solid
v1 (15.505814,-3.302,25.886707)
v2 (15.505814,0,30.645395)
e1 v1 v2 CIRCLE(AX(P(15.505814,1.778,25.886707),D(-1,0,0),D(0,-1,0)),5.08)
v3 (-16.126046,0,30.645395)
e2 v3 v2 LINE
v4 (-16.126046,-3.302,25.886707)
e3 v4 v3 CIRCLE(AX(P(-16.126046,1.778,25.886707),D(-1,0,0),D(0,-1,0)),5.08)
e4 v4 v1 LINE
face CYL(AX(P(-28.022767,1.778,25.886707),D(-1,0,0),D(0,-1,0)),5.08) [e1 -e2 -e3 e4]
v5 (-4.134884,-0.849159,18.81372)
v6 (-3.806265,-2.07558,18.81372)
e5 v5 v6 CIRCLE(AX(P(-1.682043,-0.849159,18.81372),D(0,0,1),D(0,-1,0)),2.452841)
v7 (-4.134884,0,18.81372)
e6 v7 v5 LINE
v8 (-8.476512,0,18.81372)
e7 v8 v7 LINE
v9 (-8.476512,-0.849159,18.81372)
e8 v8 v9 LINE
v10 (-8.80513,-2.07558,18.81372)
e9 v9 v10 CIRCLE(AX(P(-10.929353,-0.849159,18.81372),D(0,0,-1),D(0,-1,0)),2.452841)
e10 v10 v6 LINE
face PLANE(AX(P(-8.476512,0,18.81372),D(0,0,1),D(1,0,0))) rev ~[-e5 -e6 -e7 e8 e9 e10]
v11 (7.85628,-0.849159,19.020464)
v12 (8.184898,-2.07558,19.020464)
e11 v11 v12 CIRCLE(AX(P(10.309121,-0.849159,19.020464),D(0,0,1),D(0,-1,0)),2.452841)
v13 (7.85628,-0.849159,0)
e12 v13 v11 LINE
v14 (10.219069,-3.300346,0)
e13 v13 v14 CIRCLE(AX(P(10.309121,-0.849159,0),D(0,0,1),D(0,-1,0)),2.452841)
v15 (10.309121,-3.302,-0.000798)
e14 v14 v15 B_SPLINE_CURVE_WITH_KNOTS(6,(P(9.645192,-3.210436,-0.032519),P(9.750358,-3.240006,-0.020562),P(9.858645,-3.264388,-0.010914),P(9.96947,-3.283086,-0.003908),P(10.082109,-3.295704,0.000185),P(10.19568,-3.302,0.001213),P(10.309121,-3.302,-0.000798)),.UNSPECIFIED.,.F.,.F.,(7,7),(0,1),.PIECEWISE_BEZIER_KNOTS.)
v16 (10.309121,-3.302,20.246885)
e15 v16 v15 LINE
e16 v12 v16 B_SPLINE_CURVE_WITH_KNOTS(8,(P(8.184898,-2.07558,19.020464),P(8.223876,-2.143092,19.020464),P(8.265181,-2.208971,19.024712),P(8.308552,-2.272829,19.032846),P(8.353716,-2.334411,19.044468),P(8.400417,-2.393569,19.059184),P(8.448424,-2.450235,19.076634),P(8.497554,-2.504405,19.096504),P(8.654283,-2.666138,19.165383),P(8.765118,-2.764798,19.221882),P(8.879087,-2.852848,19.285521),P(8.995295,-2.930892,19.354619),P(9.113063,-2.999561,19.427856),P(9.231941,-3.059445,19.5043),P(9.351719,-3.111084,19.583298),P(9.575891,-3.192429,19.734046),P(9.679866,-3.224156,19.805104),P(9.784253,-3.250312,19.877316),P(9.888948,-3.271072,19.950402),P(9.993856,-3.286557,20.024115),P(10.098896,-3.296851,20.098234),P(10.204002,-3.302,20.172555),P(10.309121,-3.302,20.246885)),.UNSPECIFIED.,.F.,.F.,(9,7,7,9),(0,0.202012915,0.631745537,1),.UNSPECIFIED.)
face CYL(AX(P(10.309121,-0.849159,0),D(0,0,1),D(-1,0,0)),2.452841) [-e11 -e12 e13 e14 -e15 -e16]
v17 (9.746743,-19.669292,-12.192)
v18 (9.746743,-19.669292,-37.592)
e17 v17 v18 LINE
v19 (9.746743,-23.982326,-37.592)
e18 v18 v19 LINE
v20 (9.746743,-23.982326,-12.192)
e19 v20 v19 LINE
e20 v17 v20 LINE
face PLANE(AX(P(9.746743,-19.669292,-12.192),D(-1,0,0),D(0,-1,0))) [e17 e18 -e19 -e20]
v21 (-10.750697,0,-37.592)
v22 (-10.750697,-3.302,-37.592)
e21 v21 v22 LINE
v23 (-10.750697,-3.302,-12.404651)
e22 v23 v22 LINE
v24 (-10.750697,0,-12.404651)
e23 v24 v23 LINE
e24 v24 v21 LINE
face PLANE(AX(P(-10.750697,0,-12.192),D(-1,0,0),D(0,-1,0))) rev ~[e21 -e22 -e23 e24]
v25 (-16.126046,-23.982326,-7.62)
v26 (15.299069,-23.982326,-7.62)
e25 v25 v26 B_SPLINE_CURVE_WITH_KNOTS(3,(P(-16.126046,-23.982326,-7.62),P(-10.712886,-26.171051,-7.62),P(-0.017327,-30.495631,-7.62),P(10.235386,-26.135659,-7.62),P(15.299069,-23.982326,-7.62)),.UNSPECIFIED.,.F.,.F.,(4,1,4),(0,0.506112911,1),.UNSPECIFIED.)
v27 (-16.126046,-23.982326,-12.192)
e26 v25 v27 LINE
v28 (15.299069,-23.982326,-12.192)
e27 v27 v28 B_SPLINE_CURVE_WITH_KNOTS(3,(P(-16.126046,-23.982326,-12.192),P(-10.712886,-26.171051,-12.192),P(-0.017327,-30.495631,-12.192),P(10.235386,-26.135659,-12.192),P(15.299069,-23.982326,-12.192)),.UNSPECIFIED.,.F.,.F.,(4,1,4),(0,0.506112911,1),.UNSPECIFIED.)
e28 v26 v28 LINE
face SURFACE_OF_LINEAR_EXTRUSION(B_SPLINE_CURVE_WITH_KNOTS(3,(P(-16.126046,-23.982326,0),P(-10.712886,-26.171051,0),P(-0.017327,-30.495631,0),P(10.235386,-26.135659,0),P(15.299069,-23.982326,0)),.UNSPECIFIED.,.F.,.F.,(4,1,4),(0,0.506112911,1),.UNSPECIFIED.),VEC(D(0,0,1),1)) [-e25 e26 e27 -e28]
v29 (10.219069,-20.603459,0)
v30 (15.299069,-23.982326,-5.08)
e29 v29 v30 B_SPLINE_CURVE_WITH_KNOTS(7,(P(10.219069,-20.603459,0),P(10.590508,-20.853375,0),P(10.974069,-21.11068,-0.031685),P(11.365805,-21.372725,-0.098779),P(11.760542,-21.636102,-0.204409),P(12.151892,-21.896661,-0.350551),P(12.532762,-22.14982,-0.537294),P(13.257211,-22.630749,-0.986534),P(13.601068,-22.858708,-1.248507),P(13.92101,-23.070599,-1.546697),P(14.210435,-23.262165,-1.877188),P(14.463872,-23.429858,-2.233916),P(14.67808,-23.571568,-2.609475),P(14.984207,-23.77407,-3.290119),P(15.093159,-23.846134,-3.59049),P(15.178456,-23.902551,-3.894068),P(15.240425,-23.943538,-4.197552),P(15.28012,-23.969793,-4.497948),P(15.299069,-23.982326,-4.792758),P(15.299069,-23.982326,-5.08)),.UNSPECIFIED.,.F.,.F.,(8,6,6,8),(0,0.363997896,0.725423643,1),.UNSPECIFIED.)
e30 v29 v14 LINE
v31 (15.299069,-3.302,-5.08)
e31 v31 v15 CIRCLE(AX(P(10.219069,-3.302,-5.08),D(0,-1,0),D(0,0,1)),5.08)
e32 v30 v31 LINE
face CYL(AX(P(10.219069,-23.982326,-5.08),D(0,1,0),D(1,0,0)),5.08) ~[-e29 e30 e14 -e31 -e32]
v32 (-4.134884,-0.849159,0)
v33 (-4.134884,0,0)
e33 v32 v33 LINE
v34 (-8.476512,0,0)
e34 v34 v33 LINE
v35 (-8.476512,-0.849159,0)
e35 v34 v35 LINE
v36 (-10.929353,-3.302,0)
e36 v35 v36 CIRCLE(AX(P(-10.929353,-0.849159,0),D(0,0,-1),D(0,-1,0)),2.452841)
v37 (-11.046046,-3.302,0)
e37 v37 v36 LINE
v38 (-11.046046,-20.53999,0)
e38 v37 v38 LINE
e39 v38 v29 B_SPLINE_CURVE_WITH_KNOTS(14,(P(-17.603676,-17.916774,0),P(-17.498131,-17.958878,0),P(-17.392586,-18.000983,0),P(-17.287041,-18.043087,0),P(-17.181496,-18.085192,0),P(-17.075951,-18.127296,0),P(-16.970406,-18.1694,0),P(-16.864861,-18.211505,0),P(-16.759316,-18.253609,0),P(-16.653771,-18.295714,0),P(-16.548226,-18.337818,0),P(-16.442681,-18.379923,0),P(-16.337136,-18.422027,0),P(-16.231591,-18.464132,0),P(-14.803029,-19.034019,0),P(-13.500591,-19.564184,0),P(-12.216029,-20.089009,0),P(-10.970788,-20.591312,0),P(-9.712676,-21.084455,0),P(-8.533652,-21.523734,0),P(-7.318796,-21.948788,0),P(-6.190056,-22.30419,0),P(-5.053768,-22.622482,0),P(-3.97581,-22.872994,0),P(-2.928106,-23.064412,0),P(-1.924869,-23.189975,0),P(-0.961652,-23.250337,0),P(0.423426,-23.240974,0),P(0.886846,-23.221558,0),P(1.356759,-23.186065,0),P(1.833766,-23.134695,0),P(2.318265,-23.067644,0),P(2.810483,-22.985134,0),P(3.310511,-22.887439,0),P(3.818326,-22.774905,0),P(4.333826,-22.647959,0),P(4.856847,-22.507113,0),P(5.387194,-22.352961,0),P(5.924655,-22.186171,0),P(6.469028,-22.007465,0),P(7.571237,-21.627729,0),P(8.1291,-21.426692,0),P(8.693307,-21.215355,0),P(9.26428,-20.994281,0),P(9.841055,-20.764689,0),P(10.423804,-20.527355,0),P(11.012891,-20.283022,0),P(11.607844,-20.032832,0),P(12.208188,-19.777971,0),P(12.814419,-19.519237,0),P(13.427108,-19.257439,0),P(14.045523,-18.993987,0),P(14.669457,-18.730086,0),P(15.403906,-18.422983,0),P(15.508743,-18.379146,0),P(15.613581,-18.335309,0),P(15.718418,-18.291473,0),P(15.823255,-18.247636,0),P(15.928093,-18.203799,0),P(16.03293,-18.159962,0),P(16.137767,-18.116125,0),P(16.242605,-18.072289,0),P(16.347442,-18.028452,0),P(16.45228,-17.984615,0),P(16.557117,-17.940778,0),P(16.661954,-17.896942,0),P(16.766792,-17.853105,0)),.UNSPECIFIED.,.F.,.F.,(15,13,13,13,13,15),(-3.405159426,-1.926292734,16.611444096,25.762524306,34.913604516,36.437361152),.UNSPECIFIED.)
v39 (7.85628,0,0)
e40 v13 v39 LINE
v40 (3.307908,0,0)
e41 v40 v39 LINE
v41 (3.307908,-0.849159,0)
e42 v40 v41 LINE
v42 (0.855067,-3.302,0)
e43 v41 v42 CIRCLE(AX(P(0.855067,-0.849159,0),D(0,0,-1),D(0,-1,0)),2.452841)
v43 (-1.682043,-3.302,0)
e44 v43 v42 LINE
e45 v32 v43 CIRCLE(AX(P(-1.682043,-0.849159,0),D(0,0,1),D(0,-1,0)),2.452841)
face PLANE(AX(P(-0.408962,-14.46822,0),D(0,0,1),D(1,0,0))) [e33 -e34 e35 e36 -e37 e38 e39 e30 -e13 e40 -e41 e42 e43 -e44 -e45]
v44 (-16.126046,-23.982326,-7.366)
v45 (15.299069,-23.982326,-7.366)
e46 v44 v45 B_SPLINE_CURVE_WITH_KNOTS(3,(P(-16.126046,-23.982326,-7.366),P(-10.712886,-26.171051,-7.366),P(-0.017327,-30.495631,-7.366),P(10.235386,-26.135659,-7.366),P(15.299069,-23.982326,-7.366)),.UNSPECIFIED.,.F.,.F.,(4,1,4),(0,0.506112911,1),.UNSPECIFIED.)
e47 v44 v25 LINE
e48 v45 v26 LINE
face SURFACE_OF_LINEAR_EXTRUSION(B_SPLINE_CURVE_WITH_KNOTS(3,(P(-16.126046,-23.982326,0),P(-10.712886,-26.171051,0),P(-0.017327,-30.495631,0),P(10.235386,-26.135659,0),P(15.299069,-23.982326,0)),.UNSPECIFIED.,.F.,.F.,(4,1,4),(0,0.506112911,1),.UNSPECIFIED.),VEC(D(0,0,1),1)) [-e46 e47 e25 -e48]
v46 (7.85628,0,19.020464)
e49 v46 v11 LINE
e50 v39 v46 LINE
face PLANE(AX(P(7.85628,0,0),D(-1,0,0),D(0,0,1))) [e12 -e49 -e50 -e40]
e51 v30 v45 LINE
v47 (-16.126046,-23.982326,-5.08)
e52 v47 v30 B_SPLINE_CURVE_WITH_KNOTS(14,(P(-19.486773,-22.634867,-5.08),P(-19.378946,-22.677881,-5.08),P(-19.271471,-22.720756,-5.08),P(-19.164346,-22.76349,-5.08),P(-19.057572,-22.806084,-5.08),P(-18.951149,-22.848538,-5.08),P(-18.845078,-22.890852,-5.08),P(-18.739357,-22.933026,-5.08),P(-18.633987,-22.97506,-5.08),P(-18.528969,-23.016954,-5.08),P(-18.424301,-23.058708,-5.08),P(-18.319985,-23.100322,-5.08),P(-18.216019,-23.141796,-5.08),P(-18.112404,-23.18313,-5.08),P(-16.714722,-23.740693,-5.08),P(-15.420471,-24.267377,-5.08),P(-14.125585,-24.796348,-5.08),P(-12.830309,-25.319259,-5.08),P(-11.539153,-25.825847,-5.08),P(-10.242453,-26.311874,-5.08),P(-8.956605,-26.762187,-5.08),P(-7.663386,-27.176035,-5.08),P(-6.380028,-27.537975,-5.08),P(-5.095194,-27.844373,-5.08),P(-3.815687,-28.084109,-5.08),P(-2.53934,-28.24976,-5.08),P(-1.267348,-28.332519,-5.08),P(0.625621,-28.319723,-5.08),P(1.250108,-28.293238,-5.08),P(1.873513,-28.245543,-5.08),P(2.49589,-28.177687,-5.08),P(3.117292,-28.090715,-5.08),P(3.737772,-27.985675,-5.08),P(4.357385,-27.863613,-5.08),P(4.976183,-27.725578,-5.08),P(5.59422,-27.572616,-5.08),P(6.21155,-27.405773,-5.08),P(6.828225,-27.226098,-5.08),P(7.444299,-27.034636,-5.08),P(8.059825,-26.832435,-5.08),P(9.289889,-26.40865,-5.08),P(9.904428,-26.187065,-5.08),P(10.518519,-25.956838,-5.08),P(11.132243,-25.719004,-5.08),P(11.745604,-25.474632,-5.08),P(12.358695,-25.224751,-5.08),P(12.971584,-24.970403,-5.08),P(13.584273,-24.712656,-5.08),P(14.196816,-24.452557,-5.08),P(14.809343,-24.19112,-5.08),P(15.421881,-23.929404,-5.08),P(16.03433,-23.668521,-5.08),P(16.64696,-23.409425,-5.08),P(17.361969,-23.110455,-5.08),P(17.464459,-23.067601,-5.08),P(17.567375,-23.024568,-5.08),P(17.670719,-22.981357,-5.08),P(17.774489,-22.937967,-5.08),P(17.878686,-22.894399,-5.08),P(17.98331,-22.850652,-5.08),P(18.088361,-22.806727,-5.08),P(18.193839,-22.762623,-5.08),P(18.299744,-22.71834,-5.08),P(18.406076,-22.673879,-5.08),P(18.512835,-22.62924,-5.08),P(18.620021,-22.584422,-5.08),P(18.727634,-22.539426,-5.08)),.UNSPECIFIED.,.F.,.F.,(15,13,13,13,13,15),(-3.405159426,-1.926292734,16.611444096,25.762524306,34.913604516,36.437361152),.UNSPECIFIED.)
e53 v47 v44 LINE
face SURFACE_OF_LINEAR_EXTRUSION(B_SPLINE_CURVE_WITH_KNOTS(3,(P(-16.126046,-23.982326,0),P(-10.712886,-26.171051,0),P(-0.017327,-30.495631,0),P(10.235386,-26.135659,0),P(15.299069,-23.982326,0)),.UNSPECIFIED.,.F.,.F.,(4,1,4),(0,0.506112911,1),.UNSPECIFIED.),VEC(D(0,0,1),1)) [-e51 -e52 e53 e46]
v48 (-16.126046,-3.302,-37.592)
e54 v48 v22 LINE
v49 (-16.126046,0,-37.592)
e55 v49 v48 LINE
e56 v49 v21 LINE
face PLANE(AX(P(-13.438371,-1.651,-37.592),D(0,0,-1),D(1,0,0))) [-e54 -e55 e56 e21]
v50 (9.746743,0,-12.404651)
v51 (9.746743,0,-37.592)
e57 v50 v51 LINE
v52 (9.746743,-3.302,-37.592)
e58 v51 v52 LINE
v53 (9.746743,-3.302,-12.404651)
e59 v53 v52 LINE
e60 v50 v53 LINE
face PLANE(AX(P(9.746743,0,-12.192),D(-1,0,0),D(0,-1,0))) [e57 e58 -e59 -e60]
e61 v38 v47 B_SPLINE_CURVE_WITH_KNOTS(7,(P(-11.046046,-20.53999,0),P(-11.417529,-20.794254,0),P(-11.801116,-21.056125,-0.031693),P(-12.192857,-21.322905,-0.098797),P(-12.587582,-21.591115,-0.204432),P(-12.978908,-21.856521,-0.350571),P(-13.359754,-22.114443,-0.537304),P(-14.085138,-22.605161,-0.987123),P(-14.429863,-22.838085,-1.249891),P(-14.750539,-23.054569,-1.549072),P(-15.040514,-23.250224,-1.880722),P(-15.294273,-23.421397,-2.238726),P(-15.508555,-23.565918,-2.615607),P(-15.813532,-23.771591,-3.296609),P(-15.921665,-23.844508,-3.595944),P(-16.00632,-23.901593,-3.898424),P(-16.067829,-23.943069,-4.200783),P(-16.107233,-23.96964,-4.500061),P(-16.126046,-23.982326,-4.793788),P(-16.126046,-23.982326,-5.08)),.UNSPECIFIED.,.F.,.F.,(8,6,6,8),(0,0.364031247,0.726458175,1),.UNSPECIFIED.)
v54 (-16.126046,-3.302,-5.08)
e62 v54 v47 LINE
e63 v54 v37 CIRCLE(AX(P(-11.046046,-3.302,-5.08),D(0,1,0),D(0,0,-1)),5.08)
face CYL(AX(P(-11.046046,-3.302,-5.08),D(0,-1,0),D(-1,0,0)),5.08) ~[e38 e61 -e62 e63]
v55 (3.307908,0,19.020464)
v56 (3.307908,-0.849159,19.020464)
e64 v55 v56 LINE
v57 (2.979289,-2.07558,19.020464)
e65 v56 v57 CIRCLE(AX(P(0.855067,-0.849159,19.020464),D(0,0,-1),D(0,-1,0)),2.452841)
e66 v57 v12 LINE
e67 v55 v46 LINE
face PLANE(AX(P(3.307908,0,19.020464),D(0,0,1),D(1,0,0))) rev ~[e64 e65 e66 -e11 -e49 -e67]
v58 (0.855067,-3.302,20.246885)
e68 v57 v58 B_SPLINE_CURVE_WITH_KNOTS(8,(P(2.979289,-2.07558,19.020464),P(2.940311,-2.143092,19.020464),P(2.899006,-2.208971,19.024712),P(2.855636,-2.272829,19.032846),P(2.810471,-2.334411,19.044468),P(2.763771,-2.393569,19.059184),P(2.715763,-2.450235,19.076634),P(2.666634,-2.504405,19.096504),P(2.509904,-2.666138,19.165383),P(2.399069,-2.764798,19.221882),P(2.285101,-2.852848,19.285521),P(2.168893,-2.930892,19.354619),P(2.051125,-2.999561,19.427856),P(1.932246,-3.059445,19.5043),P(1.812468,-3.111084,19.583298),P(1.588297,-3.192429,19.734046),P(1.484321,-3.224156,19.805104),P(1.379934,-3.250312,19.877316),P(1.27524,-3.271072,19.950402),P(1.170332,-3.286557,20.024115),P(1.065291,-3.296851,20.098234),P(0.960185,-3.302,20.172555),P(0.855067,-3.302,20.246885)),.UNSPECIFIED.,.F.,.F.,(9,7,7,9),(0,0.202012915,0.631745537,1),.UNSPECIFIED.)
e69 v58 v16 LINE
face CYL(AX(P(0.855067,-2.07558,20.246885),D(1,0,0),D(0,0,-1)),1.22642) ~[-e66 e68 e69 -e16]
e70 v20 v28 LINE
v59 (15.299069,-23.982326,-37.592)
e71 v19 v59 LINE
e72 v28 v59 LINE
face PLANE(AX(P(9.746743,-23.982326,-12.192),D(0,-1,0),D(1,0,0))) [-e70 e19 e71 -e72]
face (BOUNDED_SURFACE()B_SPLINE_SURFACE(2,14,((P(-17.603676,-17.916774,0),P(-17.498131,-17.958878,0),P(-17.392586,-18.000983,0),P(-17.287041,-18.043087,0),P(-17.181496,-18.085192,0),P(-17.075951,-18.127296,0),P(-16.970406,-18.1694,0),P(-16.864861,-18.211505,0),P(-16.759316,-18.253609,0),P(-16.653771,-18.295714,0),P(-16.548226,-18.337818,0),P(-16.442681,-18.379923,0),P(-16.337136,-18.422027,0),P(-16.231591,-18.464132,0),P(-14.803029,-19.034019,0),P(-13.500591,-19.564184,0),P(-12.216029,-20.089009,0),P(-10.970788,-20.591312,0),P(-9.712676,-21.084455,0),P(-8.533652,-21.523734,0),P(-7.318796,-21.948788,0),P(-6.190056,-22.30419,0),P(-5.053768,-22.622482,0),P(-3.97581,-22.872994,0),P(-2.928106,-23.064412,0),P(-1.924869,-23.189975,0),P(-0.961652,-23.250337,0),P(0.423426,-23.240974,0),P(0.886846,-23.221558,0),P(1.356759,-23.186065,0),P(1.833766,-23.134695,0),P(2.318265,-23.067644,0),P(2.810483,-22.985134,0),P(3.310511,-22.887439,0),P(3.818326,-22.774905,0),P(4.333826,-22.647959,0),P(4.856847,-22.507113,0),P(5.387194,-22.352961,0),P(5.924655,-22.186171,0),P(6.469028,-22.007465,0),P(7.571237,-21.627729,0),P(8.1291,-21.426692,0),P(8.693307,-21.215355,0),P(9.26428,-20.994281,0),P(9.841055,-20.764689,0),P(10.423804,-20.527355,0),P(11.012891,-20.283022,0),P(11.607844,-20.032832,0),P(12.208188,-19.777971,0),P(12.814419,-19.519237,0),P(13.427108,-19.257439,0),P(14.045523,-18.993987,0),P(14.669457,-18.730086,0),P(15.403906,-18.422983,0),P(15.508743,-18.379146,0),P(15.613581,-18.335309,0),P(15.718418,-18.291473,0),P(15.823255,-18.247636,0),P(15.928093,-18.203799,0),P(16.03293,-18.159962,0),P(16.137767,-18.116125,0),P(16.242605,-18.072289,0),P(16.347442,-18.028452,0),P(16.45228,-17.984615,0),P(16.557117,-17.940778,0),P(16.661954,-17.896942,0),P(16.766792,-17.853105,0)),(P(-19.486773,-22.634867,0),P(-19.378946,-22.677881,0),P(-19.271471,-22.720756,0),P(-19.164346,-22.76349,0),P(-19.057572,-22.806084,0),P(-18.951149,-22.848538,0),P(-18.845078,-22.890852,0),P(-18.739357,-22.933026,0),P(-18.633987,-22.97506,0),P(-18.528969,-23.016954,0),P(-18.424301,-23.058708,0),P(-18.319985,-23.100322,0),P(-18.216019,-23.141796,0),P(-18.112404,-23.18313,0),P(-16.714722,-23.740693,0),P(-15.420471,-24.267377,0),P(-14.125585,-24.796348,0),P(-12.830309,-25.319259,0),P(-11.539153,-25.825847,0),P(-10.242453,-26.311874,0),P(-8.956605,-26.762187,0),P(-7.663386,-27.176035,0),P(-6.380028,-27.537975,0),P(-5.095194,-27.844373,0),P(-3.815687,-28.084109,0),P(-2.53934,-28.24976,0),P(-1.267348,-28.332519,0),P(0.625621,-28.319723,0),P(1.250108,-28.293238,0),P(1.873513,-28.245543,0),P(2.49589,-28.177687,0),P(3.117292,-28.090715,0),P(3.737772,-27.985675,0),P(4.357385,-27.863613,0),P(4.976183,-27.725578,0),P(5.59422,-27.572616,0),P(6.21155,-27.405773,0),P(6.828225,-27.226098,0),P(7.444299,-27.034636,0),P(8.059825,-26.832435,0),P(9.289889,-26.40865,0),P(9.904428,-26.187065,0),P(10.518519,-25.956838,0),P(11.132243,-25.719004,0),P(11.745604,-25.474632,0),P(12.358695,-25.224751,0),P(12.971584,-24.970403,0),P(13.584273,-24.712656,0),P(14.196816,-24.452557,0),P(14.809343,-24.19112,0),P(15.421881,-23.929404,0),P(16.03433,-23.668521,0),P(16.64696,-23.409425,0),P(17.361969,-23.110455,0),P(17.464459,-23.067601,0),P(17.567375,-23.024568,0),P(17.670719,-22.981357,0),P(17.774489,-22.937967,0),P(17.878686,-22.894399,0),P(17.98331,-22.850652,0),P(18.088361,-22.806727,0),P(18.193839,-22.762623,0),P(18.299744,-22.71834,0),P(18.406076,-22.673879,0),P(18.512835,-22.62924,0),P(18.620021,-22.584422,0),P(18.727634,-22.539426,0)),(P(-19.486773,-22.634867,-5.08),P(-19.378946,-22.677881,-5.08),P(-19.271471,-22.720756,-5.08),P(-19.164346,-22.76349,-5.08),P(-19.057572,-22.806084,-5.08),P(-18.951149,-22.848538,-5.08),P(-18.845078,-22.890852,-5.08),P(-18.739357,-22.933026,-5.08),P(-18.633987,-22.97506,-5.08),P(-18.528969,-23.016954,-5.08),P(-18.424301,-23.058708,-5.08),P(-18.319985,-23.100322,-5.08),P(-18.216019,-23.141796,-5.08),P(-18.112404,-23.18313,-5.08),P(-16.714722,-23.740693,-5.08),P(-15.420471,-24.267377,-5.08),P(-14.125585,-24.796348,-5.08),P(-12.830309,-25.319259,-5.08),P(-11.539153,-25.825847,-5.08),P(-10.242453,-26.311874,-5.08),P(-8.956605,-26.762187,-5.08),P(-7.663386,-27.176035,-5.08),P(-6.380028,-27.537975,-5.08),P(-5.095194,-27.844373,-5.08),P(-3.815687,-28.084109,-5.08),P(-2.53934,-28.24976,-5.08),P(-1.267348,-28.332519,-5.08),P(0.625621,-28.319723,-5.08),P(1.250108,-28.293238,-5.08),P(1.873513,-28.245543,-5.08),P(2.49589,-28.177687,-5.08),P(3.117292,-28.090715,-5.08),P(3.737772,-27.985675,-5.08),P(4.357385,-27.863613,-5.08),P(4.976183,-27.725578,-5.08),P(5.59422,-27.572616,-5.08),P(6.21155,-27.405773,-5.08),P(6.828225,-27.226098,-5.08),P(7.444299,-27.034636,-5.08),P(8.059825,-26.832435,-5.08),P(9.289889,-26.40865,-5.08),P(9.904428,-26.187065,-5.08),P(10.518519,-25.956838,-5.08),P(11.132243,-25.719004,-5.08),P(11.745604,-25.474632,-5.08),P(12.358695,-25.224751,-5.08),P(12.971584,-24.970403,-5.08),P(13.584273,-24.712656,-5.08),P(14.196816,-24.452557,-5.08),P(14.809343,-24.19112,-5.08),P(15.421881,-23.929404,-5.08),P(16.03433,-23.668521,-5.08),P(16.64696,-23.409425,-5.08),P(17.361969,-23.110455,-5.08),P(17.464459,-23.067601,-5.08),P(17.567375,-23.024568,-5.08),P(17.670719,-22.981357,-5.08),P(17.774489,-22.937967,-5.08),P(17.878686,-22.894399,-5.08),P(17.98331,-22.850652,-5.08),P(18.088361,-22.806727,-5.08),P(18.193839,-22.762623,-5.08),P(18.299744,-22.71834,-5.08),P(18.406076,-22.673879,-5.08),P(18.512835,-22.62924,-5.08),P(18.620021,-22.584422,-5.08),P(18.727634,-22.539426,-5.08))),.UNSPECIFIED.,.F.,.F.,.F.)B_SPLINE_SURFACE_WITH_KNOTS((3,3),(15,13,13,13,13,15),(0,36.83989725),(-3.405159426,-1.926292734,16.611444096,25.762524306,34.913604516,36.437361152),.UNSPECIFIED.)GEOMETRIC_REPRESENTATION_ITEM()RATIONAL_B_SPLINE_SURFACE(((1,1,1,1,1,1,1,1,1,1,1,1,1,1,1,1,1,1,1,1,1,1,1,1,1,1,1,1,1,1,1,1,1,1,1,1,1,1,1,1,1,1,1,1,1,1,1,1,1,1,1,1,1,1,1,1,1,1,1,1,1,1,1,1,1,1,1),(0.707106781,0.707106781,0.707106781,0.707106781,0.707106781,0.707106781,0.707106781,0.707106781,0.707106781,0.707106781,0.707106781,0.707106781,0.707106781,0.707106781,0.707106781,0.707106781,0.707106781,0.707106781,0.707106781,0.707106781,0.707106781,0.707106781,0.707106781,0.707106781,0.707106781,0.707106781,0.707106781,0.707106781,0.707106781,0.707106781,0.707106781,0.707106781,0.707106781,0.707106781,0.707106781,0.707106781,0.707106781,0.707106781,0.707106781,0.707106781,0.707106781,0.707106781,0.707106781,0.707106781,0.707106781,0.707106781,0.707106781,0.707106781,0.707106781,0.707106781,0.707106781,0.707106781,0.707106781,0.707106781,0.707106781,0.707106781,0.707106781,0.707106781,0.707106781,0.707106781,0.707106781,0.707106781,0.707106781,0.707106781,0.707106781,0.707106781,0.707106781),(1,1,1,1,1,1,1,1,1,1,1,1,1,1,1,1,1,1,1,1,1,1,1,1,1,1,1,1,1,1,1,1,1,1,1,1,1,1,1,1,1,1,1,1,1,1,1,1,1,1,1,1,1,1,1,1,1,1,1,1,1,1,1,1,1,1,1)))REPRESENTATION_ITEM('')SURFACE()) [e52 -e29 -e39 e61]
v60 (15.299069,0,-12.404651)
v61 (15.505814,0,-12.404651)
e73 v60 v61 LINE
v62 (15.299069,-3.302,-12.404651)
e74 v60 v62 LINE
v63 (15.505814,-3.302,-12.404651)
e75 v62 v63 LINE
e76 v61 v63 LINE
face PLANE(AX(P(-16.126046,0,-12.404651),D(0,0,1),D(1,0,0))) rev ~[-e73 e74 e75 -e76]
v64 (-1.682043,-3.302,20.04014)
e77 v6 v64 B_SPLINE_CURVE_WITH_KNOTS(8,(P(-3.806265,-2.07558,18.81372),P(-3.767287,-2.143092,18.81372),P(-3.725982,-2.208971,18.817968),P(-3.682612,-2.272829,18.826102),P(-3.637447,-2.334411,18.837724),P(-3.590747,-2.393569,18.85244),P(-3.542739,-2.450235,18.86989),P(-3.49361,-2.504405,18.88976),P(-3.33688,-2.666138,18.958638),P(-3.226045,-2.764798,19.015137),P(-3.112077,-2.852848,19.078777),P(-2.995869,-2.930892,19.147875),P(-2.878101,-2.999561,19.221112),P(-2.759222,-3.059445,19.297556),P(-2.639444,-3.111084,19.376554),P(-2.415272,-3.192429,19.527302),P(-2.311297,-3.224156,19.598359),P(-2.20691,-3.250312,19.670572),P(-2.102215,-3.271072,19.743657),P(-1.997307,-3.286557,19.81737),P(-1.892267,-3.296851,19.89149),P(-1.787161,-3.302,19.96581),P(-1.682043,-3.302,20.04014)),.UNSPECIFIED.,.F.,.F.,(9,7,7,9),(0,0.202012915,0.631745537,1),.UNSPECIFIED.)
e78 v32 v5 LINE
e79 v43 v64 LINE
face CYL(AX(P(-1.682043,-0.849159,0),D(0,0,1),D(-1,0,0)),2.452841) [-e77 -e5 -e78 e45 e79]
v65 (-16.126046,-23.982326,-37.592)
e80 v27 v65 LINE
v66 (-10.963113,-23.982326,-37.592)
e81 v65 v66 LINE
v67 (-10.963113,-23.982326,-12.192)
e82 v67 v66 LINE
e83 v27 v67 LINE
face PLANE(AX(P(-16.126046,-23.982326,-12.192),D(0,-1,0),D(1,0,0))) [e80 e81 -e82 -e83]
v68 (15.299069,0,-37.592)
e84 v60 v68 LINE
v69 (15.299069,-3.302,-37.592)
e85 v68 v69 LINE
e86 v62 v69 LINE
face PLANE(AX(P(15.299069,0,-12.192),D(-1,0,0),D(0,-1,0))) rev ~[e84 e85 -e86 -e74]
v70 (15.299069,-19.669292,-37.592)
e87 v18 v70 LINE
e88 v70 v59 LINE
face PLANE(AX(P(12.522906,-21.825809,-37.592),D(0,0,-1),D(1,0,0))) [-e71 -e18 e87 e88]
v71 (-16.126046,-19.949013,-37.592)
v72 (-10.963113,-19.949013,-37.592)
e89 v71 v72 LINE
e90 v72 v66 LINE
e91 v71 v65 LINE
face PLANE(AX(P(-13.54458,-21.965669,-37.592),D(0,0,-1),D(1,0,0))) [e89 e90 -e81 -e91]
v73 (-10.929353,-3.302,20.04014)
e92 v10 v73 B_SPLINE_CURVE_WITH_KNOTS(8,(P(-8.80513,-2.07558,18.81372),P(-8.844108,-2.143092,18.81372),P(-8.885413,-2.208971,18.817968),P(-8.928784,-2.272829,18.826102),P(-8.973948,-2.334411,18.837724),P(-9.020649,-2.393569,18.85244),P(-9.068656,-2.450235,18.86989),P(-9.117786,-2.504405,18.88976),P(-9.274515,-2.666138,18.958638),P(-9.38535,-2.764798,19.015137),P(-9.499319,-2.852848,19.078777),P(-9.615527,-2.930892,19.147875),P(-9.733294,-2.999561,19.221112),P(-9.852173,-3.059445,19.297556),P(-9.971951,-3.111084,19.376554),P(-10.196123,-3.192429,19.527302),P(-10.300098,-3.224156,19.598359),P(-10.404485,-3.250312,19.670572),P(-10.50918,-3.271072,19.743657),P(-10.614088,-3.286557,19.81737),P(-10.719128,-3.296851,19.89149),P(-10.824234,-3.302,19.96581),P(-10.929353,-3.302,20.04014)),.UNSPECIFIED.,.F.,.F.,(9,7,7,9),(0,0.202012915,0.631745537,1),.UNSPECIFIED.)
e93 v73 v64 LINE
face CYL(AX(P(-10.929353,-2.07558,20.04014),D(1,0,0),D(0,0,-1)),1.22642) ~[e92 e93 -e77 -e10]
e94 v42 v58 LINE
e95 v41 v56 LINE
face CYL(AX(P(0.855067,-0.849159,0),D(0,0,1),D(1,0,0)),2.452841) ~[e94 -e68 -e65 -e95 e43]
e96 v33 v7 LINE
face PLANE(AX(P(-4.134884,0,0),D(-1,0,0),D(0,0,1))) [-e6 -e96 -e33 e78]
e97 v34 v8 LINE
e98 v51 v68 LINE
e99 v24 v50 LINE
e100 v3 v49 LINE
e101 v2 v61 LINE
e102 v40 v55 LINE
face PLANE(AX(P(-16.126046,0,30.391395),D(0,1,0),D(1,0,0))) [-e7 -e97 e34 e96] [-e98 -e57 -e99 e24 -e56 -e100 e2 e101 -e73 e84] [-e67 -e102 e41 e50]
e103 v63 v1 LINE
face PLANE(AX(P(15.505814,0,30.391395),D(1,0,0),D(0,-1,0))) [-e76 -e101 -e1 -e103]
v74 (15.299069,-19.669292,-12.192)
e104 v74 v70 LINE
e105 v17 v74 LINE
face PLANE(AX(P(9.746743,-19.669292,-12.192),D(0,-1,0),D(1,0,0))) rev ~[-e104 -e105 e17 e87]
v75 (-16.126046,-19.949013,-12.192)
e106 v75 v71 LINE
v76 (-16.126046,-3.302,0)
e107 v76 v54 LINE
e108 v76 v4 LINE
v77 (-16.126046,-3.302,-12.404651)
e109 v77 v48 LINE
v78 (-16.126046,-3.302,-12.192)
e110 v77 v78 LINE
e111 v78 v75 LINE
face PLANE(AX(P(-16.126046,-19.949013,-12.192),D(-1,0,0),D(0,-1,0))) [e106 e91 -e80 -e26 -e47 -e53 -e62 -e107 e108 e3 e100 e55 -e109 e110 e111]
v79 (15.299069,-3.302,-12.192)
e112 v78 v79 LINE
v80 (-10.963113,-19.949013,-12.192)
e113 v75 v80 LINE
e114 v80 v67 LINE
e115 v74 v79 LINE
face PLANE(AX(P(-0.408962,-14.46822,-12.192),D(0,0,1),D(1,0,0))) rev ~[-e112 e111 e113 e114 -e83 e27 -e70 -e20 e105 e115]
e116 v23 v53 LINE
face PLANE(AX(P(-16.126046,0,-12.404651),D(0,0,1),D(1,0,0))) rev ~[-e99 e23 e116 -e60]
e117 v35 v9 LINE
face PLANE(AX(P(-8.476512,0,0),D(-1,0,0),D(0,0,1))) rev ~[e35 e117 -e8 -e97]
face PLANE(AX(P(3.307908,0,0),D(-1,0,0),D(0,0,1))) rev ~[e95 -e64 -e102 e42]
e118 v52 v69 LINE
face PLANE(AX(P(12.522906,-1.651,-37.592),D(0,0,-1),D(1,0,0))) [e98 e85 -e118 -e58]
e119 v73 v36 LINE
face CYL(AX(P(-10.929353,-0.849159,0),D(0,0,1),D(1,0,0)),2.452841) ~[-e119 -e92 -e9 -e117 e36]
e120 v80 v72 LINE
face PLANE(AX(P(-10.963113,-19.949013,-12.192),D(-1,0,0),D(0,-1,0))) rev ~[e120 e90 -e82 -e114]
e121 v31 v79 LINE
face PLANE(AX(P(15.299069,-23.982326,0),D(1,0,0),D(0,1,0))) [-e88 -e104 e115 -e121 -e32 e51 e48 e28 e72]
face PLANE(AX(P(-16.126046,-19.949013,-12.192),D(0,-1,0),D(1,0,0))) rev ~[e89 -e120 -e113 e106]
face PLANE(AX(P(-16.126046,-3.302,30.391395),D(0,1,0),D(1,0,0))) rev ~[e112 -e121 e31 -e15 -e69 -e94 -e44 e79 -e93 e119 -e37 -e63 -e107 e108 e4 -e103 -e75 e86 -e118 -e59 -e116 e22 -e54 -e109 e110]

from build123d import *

# Parameters (mm, degrees)
F0_W        = 31.6318599507
F0_H        = 42.7960464731
F0_W_2      = 4.3416279368
F0_H_2      = 18.813719973
F0_W_3      = 4.5483717695
F0_H_3      = 19.0204642713
F1_DEPTH    = 3.302
F3_DEPTH    = 0.254
F4_DEPTH    = 12.192
F5_DEPTH    = 7.62
F6_DEPTH    = 7.366
F7_R        = 5.08
F8_T1_DEPTH = 55.4253023246
F9_W        = 5.16293291
F9_H        = 4.0333122015
F9_W_2      = 5.5523253977
F9_H_2      = 4.3130330741
F9_H_3      = 3.302
F9_W_3      = 5.3753489628
F10_DEPTH   = 25.4
F11_R       = 2.4528409794
F12_R       = 1.2264204897


# Not quite as in the source:
# - a fillet or chamfer that OpenCascade refuses, or shapes differently, is made with other operations: its cross-section is extruded or revolved along the edge and cut away or added


with BuildPart() as f1:
    # F0 (on Front) → F1 (new body)
    with BuildSketch(Plane.XZ):
        with Locations((-0.3101159818, 8.9933718555)):
            Rectangle(F0_W, F0_H)
        with Locations((-6.3056976069, 9.4068599865)):
            Rectangle(F0_W_2, F0_H_2, mode=Mode.SUBTRACT)
        with Locations((5.5820937268, 9.5102321357)):
            Rectangle(F0_W_3, F0_H_3, mode=Mode.SUBTRACT)
    extrude(amount=F1_DEPTH)

    # F3 (add): a face of the model
    f3_faces = [f1.faces().sort_by_distance(p)[0] for p in [
        (-0.3101159818, -1.651, 30.391395092),
    ]]
    extrude(f3_faces, amount=F3_DEPTH)

    # F2 (on Top) → F4 (join)
    with BuildSketch(Plane.XY):
        with BuildLine():
            Line((-16.1260459572, -3.0640123878), (-16.1260459572, -5.3753489628))
            Line((-16.1260459572, -5.3753489628), (-16.1260459572, -23.9823255688))
            add(Edge.make_bspline(
                [(-16.1260459572, -23.9823255688), (-10.712885637, -26.1710511495), (-0.0173269949, -30.4956307693), (10.2353861269, -26.1356592233), (15.2990687639, -23.9823255688)],
                knots=[0, 0, 0, 0, 0.5061129111, 1, 1, 1, 1], degree=3))
            Line((15.2990687639, -23.9823255688), (15.2990687639, -5.1686046645))
            Line((15.2990687639, -5.1686046645), (15.2990687639, -3.0640123878))
            Line((15.2990687639, -3.0640123878), (-16.1260459572, -3.0640123878))
        make_face()
    extrude(amount=-F4_DEPTH)

    # F5 (add): a face of the model
    f5_faces = [f1.faces().sort_by_distance(p)[0] for p in [
        (-0.3946759913, -14.5235842944, 0),
    ]]
    extrude(f5_faces, amount=-F5_DEPTH)

    # F6 (add): a face of the model
    f6_faces = [f1.faces().sort_by_distance(p)[0] for p in [
        (-0.3946759913, -14.5235842944, 0),
    ]]
    extrude(f6_faces, amount=-F6_DEPTH)

    # F7
    f7_edges = [f1.edges().sort_by_distance(p)[0] for p in [
        (-0.398964, -28.322485, 0),
        (15.299069, -13.642163, 0),
        (-16.126046, -13.642163, 0),
    ]]
    fillet(f7_edges, radius=F7_R)

    # F8: fillet of radius 5.08 on 1 edges, made by hand

    # F8_s2 → F8_t1 (cut)
    with BuildSketch(Plane.YZ.offset(-28.0227671442)):
        with BuildLine():
            ThreePointArc((-3.302, 25.8867066172), (-2.3956458882, 28.782752197), (0, 30.645395092))
            Line((0, 30.645395092), (-3.302, 30.645395092))
            Line((-3.302, 30.645395092), (-3.302, 25.8867066172))
        make_face()
    extrude(amount=F8_T1_DEPTH, mode=Mode.SUBTRACT)

    # F9 (on face) → F10 (join)
    with BuildSketch(Plane(origin=(0, 0, -12.192), x_dir=(1, 0, 0), z_dir=(0, 0, -1))):
        with Locations((-13.5445795022, 21.965669468)):
            Rectangle(F9_W, F9_H)
        with Locations((12.522906065, 21.8258090317)):
            Rectangle(F9_W_2, F9_H_2)
        with Locations((12.522906065, 1.651)):
            Rectangle(F9_W_2, F9_H_3)
        with Locations((-13.4383714758, 1.651)):
            Rectangle(F9_W_3, F9_H_3)
    extrude(amount=F10_DEPTH)

    # F11
    f11_edges = [f1.edges().sort_by_distance(p)[0] for p in [
        (-8.476512, -3.302, 9.40686),
        (7.85628, -3.302, 9.510232),
        (3.307908, -3.302, 9.510232),
        (-4.134884, -3.302, 9.40686),
    ]]
    fillet(f11_edges, radius=F11_R)

    # F12
    f12_edges = [f1.edges().sort_by_distance(p)[0] for p in [
        (5.582094, -3.302, 19.020464),
        (-6.305698, -3.302, 18.81372),
    ]]
    fillet(f12_edges, radius=F12_R)


solid = f1.part
